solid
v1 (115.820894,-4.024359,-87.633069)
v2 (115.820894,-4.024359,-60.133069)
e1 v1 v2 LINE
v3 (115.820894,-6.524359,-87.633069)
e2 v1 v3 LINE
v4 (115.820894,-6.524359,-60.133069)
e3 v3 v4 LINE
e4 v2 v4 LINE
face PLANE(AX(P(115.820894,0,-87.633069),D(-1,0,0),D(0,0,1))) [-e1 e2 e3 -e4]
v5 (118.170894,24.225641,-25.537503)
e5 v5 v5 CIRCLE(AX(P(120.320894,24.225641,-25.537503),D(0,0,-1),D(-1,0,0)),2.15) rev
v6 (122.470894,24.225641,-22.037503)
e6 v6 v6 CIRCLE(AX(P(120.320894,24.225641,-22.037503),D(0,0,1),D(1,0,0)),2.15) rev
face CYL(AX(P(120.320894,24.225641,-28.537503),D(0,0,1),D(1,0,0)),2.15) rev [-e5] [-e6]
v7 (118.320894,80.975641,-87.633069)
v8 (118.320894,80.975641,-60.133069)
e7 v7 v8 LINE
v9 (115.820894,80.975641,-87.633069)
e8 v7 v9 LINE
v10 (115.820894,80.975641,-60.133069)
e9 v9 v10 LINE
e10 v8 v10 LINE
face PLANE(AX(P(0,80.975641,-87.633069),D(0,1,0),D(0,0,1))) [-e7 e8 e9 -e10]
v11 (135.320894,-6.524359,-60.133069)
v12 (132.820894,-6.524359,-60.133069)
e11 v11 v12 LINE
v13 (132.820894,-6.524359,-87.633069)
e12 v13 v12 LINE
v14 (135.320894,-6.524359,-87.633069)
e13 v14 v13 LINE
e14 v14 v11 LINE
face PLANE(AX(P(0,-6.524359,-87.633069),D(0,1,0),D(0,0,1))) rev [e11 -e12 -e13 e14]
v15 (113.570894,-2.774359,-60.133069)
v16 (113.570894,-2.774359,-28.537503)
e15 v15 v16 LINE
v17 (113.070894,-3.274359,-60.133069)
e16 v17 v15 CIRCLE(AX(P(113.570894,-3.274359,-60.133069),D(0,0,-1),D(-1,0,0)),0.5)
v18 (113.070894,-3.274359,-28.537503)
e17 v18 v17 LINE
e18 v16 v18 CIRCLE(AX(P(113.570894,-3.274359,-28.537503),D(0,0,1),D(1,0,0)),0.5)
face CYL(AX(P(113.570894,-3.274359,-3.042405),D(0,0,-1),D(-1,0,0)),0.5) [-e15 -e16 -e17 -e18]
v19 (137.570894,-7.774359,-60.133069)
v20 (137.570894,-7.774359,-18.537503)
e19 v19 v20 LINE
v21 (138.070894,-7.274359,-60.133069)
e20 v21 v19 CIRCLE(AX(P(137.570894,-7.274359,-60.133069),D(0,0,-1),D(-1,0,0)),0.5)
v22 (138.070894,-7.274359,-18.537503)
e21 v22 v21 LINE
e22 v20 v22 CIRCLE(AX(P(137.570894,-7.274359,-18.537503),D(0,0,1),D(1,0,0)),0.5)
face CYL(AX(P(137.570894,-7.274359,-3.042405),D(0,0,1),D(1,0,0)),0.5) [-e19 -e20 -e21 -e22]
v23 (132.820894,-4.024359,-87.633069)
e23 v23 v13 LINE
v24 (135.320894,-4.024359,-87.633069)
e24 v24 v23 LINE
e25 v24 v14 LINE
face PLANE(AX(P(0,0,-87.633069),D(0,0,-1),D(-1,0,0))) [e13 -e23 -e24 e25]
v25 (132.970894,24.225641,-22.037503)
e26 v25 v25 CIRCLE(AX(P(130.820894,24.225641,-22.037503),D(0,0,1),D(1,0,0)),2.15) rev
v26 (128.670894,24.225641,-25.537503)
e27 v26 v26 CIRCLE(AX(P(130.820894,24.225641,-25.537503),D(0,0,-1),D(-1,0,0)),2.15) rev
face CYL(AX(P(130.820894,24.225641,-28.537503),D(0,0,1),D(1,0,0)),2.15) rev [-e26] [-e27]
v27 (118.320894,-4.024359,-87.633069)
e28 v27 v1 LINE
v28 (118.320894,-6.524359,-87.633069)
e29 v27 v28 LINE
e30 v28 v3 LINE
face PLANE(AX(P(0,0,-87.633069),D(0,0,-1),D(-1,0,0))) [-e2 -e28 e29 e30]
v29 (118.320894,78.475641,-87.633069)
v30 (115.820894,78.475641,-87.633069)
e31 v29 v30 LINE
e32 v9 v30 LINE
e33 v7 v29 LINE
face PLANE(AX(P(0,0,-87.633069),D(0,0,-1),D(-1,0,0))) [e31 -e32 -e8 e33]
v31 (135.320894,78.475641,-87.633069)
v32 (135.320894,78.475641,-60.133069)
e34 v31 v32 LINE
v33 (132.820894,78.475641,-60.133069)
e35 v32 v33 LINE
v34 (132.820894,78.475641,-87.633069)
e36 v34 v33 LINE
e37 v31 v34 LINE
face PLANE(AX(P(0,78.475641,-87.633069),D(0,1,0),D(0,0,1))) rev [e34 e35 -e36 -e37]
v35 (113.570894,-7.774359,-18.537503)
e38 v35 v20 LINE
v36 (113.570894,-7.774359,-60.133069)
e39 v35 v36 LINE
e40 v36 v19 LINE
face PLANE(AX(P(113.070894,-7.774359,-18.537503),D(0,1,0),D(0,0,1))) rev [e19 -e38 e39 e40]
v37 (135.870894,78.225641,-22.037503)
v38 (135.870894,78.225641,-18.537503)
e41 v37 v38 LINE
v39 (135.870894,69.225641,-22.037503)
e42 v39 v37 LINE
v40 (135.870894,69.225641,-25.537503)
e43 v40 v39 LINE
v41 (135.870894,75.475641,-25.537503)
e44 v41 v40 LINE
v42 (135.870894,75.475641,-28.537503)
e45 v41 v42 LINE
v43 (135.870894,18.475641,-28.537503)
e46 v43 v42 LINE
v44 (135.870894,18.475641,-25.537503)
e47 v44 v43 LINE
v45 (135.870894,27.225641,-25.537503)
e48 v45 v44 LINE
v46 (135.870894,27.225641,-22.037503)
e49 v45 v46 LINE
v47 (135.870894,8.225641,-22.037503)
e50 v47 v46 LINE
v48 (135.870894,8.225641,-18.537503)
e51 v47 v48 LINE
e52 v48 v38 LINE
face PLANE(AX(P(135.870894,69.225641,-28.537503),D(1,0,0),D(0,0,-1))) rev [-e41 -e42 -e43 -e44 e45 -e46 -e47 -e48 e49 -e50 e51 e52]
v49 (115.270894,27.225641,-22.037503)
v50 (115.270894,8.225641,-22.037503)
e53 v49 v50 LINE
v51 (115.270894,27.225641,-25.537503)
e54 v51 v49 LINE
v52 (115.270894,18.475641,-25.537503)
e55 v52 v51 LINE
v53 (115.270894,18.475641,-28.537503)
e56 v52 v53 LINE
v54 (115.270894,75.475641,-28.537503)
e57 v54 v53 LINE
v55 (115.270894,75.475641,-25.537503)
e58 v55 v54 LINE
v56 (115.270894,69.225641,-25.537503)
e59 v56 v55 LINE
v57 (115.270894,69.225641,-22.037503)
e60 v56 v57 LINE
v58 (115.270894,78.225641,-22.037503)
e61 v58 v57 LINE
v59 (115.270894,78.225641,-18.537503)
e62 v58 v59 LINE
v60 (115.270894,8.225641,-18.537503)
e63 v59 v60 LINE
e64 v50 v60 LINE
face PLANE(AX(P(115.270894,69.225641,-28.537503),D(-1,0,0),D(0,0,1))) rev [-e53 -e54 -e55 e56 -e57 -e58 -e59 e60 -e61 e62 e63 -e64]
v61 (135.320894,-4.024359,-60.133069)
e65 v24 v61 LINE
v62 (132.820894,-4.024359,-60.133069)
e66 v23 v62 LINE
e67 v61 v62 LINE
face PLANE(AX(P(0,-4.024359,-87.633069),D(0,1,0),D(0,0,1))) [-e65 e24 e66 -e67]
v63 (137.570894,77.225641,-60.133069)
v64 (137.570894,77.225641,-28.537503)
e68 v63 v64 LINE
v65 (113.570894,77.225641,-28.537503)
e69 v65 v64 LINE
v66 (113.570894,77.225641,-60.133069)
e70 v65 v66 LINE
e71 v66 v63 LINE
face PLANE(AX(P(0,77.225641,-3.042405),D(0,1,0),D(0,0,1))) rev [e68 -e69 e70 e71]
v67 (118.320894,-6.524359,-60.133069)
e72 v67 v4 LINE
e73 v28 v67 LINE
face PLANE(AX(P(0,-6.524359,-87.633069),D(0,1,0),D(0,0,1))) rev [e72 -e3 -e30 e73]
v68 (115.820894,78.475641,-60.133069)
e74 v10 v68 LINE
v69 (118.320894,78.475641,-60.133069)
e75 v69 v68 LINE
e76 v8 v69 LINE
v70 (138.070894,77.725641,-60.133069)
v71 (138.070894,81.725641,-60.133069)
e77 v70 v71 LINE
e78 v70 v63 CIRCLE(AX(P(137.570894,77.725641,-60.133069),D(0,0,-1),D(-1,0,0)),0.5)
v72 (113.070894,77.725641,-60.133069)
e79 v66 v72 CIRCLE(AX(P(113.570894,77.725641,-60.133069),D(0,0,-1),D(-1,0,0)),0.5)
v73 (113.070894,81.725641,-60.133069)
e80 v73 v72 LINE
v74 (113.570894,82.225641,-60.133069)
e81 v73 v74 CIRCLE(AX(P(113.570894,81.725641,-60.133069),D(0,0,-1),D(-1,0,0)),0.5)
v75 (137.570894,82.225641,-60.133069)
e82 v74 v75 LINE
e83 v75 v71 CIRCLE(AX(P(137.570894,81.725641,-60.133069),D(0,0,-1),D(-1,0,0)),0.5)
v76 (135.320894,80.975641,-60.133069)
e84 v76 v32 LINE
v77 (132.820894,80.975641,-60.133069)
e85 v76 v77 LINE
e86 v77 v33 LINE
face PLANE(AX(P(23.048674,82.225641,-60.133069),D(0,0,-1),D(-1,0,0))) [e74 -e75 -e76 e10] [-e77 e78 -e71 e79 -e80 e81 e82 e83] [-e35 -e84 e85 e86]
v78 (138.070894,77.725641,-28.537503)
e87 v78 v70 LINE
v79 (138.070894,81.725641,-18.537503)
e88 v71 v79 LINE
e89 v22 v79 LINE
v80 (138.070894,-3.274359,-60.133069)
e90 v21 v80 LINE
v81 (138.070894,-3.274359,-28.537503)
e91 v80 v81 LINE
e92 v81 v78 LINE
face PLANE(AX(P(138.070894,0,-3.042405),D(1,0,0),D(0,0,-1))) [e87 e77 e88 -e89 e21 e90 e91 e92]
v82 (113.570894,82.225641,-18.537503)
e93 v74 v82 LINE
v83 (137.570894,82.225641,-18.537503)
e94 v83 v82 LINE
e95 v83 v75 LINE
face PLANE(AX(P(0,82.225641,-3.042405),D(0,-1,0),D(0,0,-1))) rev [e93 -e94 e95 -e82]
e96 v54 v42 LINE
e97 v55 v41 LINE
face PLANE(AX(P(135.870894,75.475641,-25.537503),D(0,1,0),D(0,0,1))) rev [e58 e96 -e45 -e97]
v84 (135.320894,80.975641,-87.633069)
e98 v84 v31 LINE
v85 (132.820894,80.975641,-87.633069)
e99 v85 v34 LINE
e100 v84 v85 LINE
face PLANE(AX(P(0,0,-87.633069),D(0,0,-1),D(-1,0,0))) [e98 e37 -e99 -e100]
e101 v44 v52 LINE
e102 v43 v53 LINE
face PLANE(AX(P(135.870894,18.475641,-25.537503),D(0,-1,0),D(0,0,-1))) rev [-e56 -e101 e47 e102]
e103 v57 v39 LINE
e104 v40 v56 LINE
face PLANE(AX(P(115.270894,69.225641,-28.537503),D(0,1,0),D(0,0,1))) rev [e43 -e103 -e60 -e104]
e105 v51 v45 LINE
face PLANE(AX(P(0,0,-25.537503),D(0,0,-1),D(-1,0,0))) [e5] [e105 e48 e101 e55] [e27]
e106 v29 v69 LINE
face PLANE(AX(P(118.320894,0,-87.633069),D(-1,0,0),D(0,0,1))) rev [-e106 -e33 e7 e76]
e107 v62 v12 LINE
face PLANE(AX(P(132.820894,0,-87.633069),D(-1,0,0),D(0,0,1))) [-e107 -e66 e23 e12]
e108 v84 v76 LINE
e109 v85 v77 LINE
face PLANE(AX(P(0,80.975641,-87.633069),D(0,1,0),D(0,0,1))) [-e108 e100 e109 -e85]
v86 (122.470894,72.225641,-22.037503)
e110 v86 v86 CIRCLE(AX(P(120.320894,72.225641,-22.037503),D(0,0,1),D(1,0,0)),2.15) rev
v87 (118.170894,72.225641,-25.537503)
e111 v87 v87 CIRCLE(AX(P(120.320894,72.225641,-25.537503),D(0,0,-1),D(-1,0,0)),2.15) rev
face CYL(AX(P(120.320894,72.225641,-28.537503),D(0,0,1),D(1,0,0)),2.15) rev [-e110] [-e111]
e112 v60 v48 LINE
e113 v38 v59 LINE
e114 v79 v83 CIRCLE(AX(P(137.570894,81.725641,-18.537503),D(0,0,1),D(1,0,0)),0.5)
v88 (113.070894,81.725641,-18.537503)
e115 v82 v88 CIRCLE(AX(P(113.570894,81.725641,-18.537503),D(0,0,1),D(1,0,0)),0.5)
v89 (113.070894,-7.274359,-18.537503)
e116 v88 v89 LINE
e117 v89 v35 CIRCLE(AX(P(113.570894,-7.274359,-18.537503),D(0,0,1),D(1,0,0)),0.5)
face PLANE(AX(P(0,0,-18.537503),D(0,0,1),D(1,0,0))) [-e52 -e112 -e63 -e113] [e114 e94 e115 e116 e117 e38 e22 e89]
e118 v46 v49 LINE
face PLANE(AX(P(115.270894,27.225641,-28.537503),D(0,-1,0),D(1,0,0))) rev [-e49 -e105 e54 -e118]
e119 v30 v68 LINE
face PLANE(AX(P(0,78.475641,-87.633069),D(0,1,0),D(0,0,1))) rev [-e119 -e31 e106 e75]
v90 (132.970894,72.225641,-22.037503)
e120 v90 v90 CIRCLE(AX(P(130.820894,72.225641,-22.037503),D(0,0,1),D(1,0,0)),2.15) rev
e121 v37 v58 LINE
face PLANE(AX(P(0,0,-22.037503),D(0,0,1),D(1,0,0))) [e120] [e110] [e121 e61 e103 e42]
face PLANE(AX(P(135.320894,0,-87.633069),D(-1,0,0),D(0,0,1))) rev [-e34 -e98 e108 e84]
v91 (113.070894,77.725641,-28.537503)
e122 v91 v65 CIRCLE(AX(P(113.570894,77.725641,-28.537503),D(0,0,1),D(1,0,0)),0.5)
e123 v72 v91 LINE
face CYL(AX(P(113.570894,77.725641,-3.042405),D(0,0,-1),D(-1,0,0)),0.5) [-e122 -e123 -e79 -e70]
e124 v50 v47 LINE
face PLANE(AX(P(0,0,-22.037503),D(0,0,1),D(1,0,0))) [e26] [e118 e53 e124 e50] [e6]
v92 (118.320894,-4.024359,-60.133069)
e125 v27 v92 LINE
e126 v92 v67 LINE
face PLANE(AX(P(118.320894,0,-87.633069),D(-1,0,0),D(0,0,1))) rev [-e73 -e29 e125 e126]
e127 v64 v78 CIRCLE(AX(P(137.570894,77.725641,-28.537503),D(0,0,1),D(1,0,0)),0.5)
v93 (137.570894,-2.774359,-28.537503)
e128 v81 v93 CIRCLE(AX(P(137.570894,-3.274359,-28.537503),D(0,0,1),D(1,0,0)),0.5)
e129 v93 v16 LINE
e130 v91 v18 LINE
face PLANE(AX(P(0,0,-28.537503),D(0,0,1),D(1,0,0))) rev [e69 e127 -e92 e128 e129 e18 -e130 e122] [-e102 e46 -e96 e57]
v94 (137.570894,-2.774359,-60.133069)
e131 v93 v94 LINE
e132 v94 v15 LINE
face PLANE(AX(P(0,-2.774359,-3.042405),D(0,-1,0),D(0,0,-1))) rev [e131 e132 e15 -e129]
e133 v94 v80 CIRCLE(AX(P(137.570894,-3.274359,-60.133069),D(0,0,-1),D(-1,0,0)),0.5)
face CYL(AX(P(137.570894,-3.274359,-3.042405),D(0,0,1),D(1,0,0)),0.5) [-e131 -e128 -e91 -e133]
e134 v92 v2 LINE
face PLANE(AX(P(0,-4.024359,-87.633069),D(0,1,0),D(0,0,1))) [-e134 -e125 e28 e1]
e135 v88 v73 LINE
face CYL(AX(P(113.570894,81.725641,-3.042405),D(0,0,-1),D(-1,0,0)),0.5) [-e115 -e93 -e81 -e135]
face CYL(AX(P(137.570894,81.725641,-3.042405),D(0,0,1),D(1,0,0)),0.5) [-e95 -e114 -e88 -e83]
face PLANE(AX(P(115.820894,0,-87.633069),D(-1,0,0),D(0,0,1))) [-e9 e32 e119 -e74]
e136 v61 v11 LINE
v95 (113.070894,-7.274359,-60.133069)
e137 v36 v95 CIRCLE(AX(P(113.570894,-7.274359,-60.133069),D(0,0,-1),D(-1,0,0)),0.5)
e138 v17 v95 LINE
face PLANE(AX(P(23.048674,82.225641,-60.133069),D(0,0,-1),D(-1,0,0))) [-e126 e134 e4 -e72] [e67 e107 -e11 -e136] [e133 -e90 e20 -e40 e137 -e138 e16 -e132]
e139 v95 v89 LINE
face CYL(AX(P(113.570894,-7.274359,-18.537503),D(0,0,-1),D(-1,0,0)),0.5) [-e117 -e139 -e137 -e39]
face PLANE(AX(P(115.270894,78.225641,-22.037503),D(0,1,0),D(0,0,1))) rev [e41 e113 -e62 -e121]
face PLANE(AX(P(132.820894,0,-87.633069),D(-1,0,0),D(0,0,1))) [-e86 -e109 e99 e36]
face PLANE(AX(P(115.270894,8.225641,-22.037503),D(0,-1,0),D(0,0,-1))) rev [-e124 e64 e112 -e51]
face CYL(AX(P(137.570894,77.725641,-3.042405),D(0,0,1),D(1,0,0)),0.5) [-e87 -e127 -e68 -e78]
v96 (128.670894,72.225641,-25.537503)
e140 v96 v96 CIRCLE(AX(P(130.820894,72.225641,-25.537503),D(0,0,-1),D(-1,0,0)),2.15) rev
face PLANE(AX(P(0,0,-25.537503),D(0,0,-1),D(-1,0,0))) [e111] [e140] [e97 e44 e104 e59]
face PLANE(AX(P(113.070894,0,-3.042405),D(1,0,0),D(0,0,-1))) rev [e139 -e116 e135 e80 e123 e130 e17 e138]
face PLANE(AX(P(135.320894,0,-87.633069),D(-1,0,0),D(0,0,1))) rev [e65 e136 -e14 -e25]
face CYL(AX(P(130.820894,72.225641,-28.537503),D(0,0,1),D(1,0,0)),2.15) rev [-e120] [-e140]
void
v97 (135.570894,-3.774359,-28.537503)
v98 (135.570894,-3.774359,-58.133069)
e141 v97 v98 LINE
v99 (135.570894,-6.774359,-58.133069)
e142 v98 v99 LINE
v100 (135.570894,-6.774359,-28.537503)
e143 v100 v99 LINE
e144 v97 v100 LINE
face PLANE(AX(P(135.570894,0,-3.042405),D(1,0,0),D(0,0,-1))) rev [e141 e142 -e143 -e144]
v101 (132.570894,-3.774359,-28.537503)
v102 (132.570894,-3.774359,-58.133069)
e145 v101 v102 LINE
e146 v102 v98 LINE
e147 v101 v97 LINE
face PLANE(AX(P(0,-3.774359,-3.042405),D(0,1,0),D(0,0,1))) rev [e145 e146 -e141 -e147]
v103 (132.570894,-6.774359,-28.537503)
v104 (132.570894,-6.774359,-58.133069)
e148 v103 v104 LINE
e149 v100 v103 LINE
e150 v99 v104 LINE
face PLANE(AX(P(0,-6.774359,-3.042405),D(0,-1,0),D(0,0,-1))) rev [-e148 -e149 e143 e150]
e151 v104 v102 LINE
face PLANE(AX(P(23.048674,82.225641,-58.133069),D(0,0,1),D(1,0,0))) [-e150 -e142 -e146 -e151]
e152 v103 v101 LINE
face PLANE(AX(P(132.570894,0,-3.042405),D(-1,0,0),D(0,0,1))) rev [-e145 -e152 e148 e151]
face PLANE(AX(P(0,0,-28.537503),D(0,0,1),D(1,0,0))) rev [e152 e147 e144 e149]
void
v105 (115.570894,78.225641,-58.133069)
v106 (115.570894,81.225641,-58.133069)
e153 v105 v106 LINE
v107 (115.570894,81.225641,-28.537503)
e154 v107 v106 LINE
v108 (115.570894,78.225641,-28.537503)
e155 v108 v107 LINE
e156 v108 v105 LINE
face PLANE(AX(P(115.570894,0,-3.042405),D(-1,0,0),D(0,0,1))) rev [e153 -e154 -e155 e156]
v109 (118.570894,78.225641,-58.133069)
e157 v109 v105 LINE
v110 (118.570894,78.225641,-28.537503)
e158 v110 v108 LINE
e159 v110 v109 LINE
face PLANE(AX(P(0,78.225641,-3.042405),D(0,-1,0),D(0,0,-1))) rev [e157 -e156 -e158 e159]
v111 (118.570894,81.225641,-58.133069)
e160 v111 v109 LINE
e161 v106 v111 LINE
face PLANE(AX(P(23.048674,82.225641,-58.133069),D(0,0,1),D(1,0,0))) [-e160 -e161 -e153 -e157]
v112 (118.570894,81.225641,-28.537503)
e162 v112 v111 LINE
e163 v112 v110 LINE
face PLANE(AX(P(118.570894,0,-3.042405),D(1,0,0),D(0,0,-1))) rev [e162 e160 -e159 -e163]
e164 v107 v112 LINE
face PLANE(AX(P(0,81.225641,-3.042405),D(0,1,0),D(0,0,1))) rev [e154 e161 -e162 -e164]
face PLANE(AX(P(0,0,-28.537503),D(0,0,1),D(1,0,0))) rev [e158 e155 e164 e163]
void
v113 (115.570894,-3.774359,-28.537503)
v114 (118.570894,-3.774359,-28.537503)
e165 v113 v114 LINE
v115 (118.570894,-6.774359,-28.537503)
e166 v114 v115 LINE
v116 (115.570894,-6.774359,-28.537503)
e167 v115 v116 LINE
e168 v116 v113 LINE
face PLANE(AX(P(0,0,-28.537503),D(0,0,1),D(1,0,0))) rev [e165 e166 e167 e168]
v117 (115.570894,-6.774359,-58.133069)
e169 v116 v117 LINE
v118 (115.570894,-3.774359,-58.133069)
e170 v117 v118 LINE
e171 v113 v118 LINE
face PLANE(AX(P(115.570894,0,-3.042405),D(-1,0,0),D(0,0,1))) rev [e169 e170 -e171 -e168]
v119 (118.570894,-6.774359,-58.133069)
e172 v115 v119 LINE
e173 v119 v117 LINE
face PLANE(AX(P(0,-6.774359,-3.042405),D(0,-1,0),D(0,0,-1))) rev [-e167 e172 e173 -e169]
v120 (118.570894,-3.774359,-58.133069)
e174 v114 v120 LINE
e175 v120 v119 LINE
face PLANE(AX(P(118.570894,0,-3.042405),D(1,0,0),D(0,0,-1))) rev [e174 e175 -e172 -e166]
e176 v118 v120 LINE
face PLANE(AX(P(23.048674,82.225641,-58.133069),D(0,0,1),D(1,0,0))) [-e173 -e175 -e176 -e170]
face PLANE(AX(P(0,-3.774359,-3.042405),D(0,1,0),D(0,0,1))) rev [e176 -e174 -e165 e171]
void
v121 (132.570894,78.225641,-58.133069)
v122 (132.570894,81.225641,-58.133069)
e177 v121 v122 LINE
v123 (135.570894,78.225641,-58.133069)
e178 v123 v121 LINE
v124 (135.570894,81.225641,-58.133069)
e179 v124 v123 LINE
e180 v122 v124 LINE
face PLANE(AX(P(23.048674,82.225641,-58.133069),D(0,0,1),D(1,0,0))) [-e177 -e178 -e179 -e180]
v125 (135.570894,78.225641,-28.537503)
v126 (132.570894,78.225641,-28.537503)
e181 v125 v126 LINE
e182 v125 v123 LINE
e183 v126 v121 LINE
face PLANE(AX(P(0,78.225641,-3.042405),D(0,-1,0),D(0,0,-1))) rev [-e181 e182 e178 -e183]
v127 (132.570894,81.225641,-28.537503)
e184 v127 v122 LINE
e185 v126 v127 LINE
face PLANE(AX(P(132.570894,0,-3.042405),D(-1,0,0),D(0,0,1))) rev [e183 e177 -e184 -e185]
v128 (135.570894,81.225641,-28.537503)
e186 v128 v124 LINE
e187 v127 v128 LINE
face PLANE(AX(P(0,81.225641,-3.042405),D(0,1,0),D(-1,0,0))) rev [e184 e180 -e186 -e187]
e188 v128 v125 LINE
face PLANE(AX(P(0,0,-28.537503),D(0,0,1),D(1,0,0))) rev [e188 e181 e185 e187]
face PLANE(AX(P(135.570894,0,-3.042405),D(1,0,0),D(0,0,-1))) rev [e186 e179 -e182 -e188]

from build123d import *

# Parameters (mm, degrees)
BOSS_EXTRUDE1_OUTLINE_W   = 25
BOSS_EXTRUDE1_OUTLINE_H   = 5
BOSS_EXTRUDE1_OUTLINE_W_2 = 3
BOSS_EXTRUDE1_OUTLINE_H_2 = 3
BOSS_EXTRUDE1_DEPTH       = 31.595565731
SKETCH4_W                 = 25
SKETCH4_H                 = 90
BOSS_EXTRUDE3_DEPTH       = 10
SKETCH6_R                 = 2.15
CUT_EXTRUDE2_DEPTH        = 10
SKETCH7_W                 = 20.6
SKETCH7_H                 = 42
CUT_EXTRUDE3_DEPTH        = 10
SKETCH9_W                 = 2
SKETCH9_H                 = 90
CUT_EXTRUDE4_DEPTH        = 105.890618955
SKETCH10_W                = 2
SKETCH10_H                = 90
BOSS_EXTRUDE4_DEPTH       = 25
SKETCH8_W                 = 2.5
SKETCH8_H                 = 2.5
BOSS_EXTRUDE5_DEPTH       = 27.5
SKETCH11_W                = 3
SKETCH11_H                = 80
CUT_EXTRUDE5_DEPTH        = 123.742049491
SKETCH13_W                = 20.6
SKETCH13_H                = 57
CUT_EXTRUDE6_DEPTH        = 3
FILLET1_R                 = 0.5
SKETCH14_W                = 20.6
SKETCH14_H                = 70
CUT_EXTRUDE7_DEPTH        = 3.5


# Read off the part's stored shape, not the designer's step: Boss-Extrude1
with BuildPart() as part:
    # Boss-Extrude1 outline → Boss-Extrude1 (new body)
    # profile 1 of 2: a face of its own
    with BuildSketch(Plane.XY.offset(-60.133068515)):
        with Locations((125.570893714, 79.725640866)):
            Rectangle(BOSS_EXTRUDE1_OUTLINE_W, BOSS_EXTRUDE1_OUTLINE_H)
        with Locations((117.070893714, 79.725640866)):
            Rectangle(BOSS_EXTRUDE1_OUTLINE_W_2, BOSS_EXTRUDE1_OUTLINE_H_2, mode=Mode.SUBTRACT)
        with Locations((134.070893714, 79.725640866)):
            Rectangle(BOSS_EXTRUDE1_OUTLINE_W_2, BOSS_EXTRUDE1_OUTLINE_H_2, mode=Mode.SUBTRACT)
    # profile 2 of 2: a face of its own
    with BuildSketch(Plane.XY.offset(-60.133068515)):
        with Locations((125.570893714, -5.274359134)):
            Rectangle(BOSS_EXTRUDE1_OUTLINE_W, BOSS_EXTRUDE1_OUTLINE_H)
        with Locations((117.070893714, -5.274359134)):
            Rectangle(BOSS_EXTRUDE1_OUTLINE_W_2, BOSS_EXTRUDE1_OUTLINE_H_2, mode=Mode.SUBTRACT)
        with Locations((134.070893714, -5.274359134)):
            Rectangle(BOSS_EXTRUDE1_OUTLINE_W_2, BOSS_EXTRUDE1_OUTLINE_H_2, mode=Mode.SUBTRACT)
    extrude(amount=BOSS_EXTRUDE1_DEPTH)

    # Sketch4 → Boss-Extrude3 (add)
    with BuildSketch(Plane.XY.offset(-28.537502783)):
        with Locations((125.570893714, 37.225640866)):
            Rectangle(SKETCH4_W, SKETCH4_H)
    extrude(amount=BOSS_EXTRUDE3_DEPTH)

    # Sketch6 → Cut-Extrude2 (cut)
    with BuildSketch(Plane.XY.offset(-18.537502783)):
        with Locations((130.820893714, 24.225640866)):
            Circle(SKETCH6_R)
        with Locations((120.320893714, 24.225640866)):
            Circle(SKETCH6_R)
        with Locations((130.820893714, 72.225640866)):
            Circle(SKETCH6_R)
        with Locations((120.320893714, 72.225640866)):
            Circle(SKETCH6_R)
        with Locations((130.820893714, 72.225640866)):
            Circle(SKETCH6_R)
    extrude(amount=-CUT_EXTRUDE2_DEPTH, mode=Mode.SUBTRACT)

    # Sketch7 → Cut-Extrude3 (cut)
    with BuildSketch(Plane.XY.offset(-18.537502783)):
        with Locations((125.570893714, 48.225640866)):
            Rectangle(SKETCH7_W, SKETCH7_H)
    extrude(amount=-CUT_EXTRUDE3_DEPTH, mode=Mode.SUBTRACT)

    # Sketch9 → Cut-Extrude4 (cut, through all)
    with BuildSketch(Plane(origin=(138.070893714, 0, 0), x_dir=(0, 0, -1), z_dir=(1, 0, 0))):
        with Locations((59.133068515, 37.225640866)):
            Rectangle(SKETCH9_W, SKETCH9_H)
    extrude(amount=-CUT_EXTRUDE4_DEPTH, mode=Mode.SUBTRACT)

    # Sketch10 → Boss-Extrude4 (add)
    with BuildSketch(Plane(origin=(138.070893714, 0, 0), x_dir=(0, 0, -1), z_dir=(1, 0, 0))):
        with Locations((59.133068515, 37.225640866)):
            Rectangle(SKETCH10_W, SKETCH10_H)
    extrude(amount=-BOSS_EXTRUDE4_DEPTH)

    # Sketch8 → Boss-Extrude5 (add)
    with BuildSketch(Plane(origin=(0, 0, -60.133068515), x_dir=(-1, 0, 0), z_dir=(0, 0, -1))):
        Polygon((-135.320893714, 80.975640866), (-135.320893714, 78.475640866), (-132.820893714, 78.475640866), align=None)
        Polygon((-132.820893714, 80.975640866), (-132.820893714, 78.475640866), (-135.320893714, 80.975640866), align=None)
        Polygon((-118.320893714, 80.975640866), (-118.320893714, 78.475640866), (-115.820893714, 80.975640866), align=None)
        Polygon((-118.320893714, 78.475640866), (-115.820893714, 80.975640866), (-115.820893714, 78.475640866), align=None)
        with Locations((-117.070893714, -5.274359134)):
            Rectangle(SKETCH8_W, SKETCH8_H)
        with Locations((-134.070893714, -5.274359134)):
            Rectangle(SKETCH8_W, SKETCH8_H)
    extrude(amount=BOSS_EXTRUDE5_DEPTH)

    # Sketch11 → Cut-Extrude5 (cut, through all)
    with BuildSketch(Plane(origin=(138.070893714, 0, 0), x_dir=(0, 0, -1), z_dir=(1, 0, 0))):
        with Locations((59.633068515, 37.225640866)):
            Rectangle(SKETCH11_W, SKETCH11_H)
    extrude(amount=-CUT_EXTRUDE5_DEPTH, mode=Mode.SUBTRACT)

    # Sketch13 → Cut-Extrude6 (cut)
    with BuildSketch(Plane(origin=(0, 0, -28.537502783), x_dir=(-1, 0, 0), z_dir=(0, 0, -1))):
        with Locations((-125.570893714, 46.975640866)):
            Rectangle(SKETCH13_W, SKETCH13_H)
    extrude(amount=-CUT_EXTRUDE6_DEPTH, mode=Mode.SUBTRACT)

    # Fillet1
    fillet1_edges = [part.edges().sort_by_distance(p)[0] for p in [
        (113.070893714, -7.774359134, -38.335285649),
        (138.070893714, -7.774359134, -43.335285649),
        (138.070893714, 77.225640866, -43.335285649),
        (138.070893714, 82.225640866, -39.335285649),
        (113.070893714, 82.225640866, -43.335285649),
        (138.070893714, -2.774359134, -43.335285649),
        (113.070893714, 77.225640866, -43.335285649),
        (113.070893714, -2.774359134, -43.335285649),
    ]]
    fillet(fillet1_edges, radius=FILLET1_R)

    # Sketch14 → Cut-Extrude7 (cut)
    with BuildSketch(Plane.XY.offset(-18.537502783)):
        with Locations((125.570893714, 43.225640866)):
            Rectangle(SKETCH14_W, SKETCH14_H)
    extrude(amount=-CUT_EXTRUDE7_DEPTH, mode=Mode.SUBTRACT)


solid = part.part
